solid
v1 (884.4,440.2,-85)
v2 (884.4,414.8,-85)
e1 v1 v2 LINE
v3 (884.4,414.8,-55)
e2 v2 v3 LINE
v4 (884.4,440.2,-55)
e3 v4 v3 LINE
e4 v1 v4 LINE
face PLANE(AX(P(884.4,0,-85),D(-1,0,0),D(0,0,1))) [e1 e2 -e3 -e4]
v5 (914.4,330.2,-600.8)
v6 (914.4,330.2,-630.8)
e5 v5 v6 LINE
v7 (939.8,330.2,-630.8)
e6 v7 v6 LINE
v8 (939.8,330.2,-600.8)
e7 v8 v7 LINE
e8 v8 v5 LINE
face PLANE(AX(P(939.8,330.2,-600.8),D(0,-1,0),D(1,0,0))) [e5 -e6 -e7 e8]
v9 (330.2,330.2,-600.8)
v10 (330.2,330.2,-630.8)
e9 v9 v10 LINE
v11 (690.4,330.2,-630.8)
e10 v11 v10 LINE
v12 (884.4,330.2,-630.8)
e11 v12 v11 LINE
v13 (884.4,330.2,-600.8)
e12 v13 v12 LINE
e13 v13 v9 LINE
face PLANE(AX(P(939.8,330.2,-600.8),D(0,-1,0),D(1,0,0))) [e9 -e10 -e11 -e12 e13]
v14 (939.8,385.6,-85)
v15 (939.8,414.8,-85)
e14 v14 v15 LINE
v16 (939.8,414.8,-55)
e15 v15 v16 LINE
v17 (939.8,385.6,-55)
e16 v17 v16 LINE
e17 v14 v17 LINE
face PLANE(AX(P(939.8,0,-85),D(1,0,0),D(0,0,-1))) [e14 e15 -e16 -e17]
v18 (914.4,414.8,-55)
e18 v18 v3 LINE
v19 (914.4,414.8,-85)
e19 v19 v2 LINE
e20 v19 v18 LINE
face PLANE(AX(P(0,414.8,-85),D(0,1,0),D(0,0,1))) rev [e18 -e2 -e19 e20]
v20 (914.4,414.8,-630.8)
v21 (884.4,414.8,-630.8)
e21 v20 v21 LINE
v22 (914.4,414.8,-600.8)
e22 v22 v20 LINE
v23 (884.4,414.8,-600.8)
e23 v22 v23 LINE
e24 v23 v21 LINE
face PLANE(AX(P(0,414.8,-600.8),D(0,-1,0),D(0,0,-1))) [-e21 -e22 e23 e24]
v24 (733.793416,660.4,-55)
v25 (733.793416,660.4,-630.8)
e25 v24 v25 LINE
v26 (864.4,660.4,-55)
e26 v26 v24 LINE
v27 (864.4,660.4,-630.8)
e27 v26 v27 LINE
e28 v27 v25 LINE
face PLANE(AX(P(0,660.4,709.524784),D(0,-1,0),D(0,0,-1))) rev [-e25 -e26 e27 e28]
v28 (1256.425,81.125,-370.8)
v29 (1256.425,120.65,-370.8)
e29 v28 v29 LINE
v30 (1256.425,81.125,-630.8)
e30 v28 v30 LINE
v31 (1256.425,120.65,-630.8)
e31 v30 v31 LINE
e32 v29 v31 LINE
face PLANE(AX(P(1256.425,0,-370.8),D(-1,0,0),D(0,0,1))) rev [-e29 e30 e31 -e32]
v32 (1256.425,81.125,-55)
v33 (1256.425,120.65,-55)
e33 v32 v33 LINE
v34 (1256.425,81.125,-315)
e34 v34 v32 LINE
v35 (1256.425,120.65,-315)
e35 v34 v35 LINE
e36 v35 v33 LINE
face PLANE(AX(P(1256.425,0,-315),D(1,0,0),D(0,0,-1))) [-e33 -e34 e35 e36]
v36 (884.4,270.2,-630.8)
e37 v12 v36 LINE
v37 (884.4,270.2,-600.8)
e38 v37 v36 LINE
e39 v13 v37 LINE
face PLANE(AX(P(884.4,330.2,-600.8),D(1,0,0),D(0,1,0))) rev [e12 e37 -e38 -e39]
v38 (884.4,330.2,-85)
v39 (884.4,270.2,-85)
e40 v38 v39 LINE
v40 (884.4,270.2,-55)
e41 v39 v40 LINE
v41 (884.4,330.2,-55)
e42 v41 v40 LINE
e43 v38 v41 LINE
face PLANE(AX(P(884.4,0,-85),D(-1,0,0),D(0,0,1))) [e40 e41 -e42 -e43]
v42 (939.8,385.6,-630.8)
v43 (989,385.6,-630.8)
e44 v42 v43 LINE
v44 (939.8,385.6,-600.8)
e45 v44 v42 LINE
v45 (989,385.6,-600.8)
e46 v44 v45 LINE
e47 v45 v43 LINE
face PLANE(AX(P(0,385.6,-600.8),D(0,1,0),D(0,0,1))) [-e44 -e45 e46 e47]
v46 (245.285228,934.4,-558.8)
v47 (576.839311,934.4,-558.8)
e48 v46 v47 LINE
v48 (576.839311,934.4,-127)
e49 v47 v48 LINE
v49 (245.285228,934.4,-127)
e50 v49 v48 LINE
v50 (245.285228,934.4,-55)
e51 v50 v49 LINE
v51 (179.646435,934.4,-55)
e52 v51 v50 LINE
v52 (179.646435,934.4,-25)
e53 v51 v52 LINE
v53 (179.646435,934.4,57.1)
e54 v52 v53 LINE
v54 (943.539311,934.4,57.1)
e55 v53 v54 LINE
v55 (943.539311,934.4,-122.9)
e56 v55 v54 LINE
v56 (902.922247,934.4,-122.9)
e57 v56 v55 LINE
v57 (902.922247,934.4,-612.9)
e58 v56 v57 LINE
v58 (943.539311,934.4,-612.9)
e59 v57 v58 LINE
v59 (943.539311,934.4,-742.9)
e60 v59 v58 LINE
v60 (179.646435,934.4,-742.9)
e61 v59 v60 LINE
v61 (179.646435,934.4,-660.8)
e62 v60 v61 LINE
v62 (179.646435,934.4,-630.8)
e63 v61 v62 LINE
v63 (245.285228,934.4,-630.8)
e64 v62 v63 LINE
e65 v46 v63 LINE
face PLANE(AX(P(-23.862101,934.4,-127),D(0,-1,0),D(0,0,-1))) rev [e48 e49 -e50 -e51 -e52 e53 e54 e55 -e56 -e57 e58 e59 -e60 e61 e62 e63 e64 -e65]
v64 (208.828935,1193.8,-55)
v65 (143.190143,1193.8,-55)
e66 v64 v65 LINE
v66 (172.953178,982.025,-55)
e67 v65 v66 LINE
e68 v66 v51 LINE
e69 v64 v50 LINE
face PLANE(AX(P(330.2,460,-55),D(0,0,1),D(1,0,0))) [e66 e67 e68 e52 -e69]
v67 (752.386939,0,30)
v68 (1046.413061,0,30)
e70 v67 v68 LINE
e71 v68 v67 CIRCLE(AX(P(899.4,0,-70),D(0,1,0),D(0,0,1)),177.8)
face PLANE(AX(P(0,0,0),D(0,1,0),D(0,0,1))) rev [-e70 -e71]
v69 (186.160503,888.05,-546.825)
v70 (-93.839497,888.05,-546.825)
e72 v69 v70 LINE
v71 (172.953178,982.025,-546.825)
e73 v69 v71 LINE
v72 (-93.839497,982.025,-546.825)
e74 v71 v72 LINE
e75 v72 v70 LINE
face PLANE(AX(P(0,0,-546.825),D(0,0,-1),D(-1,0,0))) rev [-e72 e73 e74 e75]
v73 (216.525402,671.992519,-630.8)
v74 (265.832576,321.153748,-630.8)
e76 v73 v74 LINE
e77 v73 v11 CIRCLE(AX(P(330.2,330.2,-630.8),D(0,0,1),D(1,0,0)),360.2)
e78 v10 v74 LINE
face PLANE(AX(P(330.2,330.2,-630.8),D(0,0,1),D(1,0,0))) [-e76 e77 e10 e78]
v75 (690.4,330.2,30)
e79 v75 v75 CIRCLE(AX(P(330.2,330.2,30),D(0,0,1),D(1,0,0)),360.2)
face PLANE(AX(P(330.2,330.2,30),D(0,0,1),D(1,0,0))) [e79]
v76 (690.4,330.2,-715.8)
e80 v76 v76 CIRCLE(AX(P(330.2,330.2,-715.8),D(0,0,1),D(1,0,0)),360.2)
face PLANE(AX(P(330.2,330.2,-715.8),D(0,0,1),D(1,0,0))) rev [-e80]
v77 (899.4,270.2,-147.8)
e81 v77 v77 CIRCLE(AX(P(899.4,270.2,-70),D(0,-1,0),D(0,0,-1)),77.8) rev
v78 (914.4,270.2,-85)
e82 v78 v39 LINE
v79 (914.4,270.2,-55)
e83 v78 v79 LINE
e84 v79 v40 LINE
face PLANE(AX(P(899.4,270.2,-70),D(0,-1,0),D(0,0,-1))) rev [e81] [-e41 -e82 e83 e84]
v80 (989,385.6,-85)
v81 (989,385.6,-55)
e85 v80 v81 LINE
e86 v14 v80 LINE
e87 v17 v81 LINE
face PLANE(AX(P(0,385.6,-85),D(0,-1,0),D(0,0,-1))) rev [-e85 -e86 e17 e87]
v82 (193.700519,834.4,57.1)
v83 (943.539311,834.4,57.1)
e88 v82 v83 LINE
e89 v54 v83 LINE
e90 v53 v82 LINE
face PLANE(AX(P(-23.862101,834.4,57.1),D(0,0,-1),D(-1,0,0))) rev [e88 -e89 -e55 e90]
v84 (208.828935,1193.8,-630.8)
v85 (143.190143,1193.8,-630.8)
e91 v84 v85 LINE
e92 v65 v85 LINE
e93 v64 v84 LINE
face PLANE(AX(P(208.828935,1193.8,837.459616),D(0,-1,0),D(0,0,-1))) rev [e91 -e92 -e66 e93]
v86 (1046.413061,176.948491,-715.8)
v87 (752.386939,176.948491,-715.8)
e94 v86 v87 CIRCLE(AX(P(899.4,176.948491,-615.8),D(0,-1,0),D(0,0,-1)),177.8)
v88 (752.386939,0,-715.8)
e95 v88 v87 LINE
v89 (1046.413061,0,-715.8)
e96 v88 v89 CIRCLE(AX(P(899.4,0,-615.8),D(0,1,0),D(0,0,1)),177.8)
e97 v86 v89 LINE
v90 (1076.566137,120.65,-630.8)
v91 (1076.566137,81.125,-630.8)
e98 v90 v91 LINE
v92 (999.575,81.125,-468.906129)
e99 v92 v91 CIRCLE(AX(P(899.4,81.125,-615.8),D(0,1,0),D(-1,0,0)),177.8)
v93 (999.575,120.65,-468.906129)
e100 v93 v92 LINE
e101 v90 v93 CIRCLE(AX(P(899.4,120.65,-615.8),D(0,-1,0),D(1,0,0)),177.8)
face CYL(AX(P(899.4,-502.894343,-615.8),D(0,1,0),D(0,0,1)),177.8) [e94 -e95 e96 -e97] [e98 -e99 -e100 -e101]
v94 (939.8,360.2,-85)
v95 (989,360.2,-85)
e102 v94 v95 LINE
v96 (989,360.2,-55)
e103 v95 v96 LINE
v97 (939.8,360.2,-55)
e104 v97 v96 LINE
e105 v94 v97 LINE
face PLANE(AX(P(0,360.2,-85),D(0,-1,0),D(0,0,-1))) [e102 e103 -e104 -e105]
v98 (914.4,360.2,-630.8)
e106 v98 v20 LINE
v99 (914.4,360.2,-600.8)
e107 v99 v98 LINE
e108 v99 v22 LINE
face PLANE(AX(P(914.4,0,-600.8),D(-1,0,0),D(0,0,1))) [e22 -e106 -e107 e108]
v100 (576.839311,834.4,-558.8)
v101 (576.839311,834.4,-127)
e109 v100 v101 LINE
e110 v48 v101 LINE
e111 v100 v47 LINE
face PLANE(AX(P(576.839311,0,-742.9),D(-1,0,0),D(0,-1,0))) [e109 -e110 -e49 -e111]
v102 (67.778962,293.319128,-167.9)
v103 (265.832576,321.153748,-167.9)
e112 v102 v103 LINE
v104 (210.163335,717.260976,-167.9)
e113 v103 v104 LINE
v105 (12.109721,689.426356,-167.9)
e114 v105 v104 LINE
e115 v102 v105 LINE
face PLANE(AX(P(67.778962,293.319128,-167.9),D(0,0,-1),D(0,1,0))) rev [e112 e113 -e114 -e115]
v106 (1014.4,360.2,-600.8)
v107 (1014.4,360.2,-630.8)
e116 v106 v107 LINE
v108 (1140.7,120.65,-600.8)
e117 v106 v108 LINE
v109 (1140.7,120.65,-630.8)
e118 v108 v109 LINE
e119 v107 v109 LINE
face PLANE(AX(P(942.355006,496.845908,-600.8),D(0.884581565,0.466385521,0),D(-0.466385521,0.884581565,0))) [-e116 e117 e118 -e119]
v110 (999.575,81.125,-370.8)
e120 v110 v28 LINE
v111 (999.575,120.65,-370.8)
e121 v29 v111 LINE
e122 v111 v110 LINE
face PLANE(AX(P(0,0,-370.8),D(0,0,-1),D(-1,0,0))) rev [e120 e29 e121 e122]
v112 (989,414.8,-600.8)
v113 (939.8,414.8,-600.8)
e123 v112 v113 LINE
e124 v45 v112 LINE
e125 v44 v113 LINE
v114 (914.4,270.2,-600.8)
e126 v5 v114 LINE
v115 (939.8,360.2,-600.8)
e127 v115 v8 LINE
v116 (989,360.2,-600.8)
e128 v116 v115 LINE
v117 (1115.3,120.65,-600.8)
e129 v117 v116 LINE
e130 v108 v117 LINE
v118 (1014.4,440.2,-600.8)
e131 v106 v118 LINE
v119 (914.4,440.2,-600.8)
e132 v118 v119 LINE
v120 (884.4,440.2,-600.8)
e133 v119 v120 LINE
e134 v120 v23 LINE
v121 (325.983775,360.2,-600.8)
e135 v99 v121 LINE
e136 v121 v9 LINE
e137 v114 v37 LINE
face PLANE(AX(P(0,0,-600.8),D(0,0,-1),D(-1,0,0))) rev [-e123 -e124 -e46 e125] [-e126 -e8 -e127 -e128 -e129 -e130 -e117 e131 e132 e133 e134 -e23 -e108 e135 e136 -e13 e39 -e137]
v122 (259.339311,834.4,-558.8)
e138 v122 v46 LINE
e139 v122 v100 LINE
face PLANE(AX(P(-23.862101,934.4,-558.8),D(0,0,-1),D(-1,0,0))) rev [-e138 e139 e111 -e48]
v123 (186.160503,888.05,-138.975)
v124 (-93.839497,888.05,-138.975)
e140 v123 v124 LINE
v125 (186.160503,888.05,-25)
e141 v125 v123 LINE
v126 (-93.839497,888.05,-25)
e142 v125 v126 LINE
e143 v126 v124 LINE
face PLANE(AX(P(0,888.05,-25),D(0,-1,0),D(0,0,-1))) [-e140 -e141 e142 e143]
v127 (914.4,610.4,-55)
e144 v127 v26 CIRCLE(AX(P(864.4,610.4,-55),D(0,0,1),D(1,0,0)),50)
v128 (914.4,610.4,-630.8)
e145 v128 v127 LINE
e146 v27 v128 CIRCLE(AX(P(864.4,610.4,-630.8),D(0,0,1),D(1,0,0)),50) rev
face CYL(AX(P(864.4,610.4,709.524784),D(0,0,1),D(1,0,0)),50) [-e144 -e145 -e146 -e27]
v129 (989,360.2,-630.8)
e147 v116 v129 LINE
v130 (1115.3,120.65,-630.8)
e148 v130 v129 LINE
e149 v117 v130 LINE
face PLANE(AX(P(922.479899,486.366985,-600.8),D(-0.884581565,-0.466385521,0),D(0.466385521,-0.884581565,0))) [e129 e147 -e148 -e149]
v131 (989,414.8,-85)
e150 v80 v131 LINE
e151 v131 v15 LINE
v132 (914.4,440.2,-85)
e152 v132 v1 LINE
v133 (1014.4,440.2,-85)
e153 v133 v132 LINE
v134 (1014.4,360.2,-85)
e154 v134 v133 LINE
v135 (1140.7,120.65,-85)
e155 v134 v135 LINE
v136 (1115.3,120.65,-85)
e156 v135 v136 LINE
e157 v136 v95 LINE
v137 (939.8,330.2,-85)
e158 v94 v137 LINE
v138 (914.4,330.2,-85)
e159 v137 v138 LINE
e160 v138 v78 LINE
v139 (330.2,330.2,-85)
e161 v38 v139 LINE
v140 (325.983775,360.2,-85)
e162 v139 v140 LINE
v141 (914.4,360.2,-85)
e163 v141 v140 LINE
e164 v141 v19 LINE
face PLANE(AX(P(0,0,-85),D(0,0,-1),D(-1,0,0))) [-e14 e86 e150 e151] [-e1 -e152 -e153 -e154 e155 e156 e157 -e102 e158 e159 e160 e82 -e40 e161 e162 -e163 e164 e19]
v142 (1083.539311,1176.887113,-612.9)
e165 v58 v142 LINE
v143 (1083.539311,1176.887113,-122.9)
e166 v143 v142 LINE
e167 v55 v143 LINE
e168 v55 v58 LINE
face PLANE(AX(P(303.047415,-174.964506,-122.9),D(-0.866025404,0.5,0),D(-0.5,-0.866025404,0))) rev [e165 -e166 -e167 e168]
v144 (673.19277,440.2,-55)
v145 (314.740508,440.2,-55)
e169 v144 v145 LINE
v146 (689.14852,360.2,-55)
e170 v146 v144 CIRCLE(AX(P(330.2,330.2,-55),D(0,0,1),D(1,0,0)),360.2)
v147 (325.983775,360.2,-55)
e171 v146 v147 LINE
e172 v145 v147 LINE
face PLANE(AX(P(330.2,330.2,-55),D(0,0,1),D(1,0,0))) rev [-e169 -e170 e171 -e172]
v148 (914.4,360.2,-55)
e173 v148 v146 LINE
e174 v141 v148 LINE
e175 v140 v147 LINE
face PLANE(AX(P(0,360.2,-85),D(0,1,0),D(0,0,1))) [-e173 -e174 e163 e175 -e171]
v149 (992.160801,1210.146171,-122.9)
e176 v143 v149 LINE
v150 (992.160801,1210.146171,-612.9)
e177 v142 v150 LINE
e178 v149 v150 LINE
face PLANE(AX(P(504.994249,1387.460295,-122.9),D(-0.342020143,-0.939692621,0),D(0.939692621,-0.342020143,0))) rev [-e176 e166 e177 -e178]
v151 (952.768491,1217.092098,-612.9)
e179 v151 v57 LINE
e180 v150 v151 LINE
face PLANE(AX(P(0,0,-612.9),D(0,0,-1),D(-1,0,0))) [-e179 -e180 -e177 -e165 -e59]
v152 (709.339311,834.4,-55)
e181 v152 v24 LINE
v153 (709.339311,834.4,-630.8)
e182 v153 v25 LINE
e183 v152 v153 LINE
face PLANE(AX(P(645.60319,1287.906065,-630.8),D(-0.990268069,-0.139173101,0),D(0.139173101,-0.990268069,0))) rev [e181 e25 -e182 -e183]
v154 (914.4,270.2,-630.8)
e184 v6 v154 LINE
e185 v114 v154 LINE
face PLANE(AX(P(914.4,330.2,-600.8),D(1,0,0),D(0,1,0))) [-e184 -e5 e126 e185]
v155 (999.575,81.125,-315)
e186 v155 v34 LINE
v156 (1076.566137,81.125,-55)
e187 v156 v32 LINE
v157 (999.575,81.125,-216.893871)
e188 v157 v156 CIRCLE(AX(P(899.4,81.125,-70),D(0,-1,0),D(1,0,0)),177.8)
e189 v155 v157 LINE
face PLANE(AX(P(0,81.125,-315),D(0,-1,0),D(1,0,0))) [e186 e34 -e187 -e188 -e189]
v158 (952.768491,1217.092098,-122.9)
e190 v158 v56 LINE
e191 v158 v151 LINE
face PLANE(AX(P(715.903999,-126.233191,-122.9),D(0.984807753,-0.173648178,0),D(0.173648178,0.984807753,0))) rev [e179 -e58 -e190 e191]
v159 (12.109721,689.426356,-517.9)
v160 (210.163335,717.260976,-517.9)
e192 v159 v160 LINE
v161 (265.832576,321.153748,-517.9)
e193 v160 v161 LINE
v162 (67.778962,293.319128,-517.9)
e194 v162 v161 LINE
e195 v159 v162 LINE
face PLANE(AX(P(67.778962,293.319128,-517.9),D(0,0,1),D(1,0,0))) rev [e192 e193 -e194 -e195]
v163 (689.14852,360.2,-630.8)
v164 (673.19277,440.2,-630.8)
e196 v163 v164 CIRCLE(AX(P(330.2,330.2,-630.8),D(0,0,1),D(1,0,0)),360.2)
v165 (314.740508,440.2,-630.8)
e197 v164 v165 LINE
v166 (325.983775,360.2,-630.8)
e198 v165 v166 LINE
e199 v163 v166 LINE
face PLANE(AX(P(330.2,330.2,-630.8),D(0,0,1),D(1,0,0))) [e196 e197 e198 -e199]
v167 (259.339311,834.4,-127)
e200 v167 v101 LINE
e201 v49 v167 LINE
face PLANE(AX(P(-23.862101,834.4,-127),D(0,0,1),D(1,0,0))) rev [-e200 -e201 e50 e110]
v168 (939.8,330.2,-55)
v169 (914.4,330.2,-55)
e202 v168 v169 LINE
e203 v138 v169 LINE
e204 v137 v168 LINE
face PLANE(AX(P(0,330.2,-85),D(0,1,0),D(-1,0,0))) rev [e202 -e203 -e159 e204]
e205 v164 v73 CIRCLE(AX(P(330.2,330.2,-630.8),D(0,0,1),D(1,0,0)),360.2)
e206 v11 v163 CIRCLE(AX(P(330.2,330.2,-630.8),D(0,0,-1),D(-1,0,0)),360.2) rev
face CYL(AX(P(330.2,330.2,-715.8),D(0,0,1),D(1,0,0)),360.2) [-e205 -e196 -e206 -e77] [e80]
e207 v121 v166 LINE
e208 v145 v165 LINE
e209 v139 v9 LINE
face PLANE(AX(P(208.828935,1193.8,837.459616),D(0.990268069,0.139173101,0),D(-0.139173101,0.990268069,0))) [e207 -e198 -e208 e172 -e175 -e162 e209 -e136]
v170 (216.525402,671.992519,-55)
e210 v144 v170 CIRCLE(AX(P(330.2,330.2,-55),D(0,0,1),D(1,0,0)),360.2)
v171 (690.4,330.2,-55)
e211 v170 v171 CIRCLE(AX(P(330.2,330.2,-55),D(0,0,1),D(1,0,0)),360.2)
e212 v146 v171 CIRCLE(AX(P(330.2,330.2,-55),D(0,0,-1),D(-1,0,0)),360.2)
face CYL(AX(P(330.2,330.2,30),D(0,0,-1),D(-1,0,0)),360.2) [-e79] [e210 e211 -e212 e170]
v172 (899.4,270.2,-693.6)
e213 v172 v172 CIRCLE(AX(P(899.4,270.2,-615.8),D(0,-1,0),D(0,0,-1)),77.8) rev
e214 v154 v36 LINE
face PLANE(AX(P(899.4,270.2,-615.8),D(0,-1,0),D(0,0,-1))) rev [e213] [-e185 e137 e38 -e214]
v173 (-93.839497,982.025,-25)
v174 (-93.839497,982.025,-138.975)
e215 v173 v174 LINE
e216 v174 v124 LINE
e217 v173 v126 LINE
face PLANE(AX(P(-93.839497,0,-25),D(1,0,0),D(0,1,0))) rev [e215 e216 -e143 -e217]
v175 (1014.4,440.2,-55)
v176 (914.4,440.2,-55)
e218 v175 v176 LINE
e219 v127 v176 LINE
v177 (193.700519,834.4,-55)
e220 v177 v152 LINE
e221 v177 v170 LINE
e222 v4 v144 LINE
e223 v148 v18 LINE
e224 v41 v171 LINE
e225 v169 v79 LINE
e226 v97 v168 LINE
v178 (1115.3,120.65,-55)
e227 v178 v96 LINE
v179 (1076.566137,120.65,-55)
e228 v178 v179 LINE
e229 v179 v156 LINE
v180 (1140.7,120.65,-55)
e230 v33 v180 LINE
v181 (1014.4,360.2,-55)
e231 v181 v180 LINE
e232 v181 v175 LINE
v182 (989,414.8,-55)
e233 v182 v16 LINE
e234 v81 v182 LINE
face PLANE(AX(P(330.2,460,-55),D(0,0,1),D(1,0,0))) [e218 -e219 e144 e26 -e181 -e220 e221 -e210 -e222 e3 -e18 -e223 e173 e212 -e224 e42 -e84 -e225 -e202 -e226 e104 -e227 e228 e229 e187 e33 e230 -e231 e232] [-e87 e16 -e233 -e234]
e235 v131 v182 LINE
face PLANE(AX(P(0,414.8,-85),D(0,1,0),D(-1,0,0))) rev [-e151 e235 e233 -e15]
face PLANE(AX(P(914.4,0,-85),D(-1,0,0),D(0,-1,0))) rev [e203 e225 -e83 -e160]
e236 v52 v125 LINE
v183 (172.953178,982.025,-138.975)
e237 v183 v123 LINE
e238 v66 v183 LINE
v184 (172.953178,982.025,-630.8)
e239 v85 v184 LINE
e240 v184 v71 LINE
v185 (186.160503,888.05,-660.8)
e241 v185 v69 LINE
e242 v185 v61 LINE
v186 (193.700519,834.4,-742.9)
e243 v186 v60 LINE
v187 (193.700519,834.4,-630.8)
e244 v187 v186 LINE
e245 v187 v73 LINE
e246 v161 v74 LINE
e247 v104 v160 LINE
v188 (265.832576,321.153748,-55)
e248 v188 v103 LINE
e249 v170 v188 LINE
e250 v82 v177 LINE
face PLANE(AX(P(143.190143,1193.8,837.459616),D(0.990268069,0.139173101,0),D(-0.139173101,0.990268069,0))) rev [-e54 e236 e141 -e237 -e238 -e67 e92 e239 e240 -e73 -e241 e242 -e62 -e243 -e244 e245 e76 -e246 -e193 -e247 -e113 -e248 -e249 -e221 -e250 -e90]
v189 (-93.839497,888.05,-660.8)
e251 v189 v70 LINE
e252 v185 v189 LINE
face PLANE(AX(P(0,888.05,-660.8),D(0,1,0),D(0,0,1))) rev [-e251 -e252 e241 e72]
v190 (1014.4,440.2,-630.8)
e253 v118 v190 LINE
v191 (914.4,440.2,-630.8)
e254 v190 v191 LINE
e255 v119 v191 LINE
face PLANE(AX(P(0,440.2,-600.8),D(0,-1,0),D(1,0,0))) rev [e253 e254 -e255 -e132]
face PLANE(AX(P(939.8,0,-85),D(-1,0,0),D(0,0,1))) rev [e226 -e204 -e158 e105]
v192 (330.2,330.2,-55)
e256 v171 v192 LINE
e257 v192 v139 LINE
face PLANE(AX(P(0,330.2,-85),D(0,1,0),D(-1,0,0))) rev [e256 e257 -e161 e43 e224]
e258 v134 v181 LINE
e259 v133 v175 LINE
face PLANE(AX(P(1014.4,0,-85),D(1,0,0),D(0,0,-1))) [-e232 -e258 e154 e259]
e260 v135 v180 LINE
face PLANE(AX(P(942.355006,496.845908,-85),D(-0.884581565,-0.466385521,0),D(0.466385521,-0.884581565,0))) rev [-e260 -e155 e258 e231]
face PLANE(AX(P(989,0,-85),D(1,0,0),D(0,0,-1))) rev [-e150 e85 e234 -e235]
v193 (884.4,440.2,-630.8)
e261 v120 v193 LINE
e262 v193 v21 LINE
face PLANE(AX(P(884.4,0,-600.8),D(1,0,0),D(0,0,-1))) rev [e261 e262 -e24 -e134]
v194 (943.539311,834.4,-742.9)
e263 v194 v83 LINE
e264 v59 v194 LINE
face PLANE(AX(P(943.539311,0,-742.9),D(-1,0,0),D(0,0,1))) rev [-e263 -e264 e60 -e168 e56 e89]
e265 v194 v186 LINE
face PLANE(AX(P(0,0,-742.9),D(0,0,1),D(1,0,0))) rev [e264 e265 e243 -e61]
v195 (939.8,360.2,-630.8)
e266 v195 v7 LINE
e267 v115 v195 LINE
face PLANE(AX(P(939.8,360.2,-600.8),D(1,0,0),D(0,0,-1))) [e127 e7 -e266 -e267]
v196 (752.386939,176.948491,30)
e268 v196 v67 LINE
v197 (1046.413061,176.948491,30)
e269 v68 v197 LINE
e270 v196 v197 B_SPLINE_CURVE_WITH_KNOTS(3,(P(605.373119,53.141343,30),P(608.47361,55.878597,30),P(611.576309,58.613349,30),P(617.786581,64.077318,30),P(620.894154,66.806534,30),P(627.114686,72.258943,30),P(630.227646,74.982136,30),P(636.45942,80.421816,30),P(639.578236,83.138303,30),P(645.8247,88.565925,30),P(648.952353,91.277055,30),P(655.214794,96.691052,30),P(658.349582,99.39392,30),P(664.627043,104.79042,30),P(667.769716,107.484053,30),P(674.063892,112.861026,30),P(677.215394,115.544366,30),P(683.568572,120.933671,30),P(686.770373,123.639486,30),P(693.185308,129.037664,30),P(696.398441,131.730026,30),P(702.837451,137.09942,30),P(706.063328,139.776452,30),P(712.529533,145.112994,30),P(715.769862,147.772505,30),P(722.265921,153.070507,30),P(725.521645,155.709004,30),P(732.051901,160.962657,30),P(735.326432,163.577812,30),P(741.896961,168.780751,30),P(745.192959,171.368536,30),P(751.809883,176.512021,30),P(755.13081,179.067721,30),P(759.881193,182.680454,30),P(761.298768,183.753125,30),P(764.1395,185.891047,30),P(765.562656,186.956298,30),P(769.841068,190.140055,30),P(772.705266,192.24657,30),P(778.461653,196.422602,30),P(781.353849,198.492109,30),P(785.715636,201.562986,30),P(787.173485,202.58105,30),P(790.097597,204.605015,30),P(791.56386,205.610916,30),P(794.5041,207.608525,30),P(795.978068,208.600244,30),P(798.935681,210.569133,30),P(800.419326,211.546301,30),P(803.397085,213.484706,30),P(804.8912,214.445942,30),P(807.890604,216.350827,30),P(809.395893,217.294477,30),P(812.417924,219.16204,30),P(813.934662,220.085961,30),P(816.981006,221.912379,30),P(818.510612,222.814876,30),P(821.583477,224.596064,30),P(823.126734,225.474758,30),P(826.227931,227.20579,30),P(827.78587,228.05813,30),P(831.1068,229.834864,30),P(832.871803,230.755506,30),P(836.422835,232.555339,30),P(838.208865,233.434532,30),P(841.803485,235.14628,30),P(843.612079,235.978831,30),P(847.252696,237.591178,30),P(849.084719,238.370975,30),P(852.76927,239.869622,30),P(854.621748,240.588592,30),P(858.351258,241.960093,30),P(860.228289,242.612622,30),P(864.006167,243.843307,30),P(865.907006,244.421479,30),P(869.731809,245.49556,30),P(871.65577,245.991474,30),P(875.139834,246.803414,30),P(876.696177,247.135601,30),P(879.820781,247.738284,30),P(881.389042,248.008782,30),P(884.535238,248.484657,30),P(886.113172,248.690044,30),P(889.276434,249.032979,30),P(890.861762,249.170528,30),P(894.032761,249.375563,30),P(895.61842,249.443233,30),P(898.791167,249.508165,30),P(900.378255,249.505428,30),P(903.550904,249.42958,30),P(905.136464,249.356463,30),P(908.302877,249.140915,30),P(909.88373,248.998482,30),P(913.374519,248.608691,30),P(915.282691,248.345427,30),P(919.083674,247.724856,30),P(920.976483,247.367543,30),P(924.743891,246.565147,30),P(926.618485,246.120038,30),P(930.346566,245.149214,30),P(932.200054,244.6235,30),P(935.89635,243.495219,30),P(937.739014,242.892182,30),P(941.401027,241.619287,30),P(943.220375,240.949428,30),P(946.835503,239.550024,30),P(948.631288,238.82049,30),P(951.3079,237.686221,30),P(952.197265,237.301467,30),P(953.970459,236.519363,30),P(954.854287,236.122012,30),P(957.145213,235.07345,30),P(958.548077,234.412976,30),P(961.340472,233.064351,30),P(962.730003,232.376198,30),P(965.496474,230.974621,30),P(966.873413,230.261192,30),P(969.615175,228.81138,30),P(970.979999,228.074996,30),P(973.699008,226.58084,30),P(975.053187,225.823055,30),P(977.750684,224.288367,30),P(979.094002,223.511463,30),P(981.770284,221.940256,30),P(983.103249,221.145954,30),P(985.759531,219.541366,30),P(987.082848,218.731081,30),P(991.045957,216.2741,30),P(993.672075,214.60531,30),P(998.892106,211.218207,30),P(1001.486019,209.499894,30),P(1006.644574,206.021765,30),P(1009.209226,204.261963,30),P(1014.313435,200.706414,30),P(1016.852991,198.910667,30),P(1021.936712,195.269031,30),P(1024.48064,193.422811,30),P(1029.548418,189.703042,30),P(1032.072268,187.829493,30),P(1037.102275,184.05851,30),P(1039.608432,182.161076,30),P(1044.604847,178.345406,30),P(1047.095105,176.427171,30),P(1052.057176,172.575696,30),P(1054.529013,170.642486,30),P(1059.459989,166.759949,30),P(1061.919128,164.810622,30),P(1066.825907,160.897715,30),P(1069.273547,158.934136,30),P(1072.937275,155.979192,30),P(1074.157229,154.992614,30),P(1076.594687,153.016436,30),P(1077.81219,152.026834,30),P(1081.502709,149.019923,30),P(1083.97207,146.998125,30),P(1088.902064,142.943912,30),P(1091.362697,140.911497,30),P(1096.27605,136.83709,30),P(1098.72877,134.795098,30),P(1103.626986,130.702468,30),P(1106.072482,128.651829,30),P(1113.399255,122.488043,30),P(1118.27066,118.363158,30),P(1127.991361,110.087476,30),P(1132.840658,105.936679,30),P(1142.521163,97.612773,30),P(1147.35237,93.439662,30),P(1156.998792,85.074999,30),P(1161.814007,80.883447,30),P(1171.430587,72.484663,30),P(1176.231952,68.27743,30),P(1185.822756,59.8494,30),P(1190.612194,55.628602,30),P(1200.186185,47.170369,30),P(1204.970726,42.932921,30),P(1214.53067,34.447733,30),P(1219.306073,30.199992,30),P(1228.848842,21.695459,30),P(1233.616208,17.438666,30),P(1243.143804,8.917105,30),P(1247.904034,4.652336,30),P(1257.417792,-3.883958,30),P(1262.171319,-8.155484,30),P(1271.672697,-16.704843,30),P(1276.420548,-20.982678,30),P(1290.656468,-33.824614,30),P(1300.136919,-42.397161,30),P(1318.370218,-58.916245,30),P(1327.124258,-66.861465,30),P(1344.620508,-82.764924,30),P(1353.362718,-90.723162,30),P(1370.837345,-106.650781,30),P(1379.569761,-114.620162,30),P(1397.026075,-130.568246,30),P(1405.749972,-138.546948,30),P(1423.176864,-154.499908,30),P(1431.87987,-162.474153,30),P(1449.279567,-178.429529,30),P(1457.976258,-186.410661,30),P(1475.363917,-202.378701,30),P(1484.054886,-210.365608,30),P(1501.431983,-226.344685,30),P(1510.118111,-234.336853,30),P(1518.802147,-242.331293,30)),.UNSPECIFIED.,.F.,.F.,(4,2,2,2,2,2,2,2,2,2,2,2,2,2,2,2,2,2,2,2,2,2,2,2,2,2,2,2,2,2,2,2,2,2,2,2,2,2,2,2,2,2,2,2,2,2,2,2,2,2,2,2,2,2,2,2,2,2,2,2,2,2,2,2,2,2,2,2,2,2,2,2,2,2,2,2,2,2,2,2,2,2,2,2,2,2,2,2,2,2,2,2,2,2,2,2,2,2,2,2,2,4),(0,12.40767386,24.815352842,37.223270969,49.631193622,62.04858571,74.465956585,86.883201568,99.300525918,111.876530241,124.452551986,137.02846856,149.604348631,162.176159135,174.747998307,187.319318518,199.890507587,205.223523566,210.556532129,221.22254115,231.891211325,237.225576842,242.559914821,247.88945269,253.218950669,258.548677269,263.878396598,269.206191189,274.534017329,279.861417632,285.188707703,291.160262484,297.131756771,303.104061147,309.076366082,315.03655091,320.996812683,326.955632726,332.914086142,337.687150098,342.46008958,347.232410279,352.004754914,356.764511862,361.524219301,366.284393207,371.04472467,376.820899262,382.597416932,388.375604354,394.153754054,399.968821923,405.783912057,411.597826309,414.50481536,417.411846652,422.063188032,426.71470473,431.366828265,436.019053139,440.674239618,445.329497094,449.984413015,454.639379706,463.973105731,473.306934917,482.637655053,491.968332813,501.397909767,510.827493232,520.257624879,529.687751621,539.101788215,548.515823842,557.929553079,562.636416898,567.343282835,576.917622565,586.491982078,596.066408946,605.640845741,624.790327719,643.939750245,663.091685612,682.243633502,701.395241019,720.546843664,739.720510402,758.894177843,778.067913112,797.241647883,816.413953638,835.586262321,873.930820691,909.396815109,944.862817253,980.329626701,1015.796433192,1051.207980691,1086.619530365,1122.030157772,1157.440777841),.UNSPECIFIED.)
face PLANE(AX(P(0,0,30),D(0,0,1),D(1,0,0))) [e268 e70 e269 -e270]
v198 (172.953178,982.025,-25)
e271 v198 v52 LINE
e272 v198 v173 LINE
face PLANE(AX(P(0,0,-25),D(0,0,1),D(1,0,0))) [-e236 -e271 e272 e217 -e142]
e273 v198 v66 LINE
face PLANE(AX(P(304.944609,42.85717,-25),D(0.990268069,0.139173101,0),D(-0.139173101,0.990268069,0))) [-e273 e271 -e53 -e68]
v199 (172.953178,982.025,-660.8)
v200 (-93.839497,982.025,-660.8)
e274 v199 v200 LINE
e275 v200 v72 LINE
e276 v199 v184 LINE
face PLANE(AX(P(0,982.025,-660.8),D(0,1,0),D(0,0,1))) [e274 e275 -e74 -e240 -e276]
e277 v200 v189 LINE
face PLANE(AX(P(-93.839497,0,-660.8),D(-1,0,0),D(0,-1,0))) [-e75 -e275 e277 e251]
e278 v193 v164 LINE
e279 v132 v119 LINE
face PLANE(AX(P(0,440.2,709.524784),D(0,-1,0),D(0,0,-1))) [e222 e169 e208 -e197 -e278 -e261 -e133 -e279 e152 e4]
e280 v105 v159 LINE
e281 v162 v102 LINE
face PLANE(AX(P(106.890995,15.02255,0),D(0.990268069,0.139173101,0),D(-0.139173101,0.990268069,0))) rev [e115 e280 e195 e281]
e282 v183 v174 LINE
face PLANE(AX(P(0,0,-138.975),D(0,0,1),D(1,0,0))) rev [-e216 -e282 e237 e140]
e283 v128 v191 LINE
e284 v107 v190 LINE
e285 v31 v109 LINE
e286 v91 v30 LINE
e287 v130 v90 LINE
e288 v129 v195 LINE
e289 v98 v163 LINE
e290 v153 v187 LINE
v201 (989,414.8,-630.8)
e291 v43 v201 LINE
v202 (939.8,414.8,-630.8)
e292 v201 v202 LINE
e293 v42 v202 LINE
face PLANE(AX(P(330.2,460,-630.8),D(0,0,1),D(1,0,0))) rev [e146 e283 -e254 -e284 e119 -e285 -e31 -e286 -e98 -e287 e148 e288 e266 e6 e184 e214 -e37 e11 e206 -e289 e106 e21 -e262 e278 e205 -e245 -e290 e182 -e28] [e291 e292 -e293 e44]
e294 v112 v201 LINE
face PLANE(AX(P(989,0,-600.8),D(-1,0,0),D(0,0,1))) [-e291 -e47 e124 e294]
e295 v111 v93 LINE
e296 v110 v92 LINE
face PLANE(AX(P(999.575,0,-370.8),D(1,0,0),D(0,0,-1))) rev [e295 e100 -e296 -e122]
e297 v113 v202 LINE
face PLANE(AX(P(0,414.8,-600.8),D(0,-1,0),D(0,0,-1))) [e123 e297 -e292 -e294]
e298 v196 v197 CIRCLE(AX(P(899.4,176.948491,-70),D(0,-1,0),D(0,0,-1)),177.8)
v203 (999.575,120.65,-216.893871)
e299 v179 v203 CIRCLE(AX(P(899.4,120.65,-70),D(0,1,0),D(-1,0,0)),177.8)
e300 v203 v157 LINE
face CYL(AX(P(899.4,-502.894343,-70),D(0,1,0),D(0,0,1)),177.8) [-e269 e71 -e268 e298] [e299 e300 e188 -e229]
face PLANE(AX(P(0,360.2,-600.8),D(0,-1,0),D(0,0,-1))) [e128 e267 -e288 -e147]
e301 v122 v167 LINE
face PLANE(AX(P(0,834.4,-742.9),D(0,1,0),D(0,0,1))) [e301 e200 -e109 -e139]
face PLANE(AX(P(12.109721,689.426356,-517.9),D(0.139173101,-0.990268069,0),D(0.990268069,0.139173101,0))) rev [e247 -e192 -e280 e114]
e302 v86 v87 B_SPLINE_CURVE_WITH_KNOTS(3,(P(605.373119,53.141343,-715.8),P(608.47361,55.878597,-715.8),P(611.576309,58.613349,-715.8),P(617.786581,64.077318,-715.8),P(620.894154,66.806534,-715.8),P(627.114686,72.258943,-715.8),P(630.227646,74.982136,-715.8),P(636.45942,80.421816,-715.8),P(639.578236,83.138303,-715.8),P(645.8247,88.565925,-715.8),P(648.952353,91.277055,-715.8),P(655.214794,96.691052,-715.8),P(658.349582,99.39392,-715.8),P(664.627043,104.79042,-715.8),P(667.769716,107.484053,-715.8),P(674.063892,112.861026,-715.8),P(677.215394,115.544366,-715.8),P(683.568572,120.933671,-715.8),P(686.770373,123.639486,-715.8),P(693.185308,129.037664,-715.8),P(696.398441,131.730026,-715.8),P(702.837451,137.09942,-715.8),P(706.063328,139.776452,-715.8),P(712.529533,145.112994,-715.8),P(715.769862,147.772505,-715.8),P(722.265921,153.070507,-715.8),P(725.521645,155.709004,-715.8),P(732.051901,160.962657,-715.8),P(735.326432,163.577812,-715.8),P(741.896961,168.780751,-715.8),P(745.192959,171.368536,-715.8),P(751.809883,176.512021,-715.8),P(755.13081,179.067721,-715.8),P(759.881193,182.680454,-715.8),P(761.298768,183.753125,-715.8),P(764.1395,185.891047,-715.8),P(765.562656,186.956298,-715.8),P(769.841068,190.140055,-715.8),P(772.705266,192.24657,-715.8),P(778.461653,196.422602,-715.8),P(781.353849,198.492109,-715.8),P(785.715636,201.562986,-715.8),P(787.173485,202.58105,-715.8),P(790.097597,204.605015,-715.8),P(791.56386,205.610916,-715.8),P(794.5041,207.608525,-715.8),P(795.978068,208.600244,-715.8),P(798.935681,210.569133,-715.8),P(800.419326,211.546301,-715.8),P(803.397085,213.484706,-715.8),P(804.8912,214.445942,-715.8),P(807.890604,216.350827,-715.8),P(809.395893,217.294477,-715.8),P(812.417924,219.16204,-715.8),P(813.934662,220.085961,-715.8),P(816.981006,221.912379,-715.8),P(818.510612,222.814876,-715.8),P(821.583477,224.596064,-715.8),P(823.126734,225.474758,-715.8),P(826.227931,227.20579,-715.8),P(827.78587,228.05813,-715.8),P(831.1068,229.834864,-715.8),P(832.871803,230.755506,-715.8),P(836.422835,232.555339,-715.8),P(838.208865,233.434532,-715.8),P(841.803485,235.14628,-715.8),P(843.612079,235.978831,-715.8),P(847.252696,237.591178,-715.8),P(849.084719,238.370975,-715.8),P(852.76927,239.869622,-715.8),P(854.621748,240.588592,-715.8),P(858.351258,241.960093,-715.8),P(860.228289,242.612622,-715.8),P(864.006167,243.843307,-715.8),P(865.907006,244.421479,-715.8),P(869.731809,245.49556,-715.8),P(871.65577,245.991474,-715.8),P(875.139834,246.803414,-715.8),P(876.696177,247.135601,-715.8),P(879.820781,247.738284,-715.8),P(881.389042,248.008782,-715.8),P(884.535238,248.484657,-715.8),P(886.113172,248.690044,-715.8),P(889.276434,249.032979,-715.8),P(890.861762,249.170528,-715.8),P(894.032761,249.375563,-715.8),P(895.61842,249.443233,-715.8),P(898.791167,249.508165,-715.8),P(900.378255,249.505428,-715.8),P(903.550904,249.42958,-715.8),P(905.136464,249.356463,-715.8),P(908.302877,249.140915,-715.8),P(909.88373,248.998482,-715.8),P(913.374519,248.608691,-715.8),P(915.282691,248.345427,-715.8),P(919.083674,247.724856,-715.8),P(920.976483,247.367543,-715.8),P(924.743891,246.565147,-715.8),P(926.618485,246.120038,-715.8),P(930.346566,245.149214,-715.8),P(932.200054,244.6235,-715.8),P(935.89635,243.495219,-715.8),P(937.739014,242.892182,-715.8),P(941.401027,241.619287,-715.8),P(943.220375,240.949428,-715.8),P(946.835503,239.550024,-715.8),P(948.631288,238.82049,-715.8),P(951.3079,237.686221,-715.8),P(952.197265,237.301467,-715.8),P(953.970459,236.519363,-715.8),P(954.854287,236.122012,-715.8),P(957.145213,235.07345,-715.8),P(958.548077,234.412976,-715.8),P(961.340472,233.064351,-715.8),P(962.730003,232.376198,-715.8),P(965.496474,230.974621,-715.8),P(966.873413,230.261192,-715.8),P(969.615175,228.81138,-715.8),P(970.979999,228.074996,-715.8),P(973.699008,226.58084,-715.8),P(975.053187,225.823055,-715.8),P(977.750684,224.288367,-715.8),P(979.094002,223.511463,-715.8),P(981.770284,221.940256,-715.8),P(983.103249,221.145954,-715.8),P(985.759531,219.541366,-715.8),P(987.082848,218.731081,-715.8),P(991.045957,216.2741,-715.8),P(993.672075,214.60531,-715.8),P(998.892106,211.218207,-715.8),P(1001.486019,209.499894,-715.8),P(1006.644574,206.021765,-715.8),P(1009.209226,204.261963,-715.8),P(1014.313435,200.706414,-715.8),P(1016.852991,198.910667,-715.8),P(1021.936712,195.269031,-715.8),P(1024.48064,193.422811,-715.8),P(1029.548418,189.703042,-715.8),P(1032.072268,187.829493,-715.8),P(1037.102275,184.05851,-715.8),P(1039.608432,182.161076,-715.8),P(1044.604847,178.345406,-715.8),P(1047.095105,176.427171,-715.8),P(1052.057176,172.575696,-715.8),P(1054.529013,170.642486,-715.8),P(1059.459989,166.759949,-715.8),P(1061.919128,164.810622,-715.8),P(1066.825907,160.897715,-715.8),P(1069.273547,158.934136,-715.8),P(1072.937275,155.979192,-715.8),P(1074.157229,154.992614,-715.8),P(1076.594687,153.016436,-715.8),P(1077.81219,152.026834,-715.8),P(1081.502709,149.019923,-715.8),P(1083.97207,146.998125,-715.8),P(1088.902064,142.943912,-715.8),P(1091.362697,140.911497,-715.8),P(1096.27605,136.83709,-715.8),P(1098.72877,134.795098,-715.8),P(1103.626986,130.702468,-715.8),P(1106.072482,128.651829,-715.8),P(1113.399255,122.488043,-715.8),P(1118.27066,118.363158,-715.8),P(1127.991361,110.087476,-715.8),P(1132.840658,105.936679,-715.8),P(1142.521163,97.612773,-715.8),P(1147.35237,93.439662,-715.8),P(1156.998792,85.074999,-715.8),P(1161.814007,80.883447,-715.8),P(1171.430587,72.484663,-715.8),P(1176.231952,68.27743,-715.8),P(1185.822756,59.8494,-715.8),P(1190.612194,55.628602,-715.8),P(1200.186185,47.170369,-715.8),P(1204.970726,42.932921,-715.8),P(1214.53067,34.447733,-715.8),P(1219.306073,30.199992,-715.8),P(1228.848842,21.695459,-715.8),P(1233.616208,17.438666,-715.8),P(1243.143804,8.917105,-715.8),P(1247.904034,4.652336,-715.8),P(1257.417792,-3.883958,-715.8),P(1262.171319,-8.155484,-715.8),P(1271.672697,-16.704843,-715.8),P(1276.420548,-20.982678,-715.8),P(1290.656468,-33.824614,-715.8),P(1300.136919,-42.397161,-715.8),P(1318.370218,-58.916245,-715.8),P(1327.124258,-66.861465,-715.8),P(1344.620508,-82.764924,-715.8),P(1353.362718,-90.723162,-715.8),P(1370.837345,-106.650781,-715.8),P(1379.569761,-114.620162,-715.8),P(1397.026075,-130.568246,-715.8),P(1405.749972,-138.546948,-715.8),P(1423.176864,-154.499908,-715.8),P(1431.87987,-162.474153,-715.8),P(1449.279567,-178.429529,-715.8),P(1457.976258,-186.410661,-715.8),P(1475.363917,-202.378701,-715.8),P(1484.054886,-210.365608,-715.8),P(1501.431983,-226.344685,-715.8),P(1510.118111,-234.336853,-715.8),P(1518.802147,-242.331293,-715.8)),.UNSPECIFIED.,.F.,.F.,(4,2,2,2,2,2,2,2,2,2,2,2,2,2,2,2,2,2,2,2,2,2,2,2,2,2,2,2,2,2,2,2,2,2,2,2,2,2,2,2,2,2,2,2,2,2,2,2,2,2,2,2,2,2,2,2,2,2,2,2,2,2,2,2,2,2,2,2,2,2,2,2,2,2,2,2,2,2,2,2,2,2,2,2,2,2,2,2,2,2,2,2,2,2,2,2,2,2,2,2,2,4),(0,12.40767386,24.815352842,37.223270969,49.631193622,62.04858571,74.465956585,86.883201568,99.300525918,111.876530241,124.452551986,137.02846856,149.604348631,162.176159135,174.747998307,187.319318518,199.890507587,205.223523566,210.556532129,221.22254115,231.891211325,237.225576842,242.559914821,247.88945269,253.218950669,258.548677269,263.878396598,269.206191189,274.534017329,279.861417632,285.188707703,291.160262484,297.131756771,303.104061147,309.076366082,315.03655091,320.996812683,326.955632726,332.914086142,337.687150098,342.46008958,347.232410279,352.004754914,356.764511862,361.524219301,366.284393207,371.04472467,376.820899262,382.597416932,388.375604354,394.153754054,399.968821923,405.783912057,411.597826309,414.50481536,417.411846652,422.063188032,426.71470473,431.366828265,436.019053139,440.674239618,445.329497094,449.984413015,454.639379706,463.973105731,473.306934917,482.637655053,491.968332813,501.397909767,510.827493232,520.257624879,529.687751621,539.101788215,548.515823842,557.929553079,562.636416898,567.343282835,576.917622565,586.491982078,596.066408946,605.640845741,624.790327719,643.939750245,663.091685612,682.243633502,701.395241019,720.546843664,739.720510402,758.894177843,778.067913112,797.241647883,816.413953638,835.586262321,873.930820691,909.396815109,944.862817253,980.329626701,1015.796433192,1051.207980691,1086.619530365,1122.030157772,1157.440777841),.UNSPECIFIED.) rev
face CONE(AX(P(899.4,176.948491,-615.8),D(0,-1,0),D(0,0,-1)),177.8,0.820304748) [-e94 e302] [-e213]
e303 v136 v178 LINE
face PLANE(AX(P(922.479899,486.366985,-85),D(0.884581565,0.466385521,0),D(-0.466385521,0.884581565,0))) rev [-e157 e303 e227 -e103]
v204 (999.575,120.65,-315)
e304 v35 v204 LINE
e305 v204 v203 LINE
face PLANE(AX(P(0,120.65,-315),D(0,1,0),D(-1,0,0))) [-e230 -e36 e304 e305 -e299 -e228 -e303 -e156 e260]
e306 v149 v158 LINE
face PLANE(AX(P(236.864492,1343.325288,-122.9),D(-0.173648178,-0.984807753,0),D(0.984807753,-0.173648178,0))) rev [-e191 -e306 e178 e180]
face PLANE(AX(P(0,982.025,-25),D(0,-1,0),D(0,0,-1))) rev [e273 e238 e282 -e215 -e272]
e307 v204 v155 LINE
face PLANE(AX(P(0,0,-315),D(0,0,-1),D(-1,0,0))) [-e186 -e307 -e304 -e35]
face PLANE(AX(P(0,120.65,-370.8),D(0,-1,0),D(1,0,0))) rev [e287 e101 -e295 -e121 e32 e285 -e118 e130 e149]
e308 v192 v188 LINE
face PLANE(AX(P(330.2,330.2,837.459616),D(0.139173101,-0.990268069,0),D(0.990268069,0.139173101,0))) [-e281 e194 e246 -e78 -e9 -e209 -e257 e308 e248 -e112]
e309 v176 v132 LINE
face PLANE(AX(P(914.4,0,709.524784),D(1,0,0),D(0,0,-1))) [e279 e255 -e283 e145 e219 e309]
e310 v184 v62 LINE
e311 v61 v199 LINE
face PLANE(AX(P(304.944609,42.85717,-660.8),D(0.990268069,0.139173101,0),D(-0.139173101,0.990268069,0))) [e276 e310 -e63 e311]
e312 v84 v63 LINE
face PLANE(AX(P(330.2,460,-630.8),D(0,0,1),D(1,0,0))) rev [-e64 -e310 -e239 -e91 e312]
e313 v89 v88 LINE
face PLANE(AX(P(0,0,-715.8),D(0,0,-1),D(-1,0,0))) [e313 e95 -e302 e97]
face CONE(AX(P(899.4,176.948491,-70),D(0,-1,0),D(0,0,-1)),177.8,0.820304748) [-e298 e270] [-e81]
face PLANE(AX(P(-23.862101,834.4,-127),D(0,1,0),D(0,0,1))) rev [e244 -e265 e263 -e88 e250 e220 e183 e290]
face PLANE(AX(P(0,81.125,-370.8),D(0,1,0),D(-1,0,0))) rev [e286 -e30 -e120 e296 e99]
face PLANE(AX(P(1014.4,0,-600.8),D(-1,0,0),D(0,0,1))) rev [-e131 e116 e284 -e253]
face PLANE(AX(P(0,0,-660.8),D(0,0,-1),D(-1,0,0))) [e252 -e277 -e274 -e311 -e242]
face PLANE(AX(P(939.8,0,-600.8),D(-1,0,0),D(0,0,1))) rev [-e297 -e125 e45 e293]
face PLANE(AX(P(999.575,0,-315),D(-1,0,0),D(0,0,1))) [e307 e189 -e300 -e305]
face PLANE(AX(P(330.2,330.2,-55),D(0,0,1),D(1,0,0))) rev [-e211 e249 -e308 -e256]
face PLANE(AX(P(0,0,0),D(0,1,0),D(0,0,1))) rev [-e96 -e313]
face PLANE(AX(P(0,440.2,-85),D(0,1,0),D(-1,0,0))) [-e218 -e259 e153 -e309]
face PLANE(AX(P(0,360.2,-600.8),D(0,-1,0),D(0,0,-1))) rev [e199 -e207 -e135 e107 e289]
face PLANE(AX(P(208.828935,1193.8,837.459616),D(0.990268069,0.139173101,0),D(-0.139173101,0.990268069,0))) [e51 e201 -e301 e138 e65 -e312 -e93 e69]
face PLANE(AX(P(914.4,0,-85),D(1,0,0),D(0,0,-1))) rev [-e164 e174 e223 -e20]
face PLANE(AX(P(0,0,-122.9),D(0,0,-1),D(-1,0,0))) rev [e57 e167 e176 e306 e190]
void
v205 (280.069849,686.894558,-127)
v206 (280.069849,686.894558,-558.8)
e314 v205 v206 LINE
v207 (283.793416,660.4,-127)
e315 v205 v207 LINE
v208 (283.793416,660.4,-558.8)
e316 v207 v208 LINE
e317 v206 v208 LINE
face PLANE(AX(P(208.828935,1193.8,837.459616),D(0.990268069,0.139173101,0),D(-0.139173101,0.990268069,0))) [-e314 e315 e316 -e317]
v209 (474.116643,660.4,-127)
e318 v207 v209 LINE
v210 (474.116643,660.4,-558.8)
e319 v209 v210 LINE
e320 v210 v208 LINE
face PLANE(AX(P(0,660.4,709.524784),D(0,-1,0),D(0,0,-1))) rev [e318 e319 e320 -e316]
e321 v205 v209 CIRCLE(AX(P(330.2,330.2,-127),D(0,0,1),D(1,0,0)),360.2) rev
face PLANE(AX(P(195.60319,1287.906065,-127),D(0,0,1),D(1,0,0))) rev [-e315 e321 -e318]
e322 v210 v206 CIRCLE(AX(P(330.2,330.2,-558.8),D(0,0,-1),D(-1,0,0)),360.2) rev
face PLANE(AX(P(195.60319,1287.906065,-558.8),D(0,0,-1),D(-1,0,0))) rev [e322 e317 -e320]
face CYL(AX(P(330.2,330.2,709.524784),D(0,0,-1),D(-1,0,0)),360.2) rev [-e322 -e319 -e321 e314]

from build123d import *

# Parameters (mm, degrees)
BOSS_EXTRUDE1_DEPTH       = 30
BOSS_EXTRUDE1_DEPTH_BACK  = 55
SKETCH1_R                 = 360.2
BOSS_EXTRUDE2_DEPTH       = 55
BOSS_EXTRUDE2_DEPTH_BACK  = 30
SKETCH2_R                 = 360.2
BOSS_EXTRUDE3_DEPTH       = 10
BOSS_EXTRUDE6_DEPTH       = 575.8
BOSS_EXTRUDE33_DEPTH      = 400
BOSS_EXTRUDE33_DEPTH_BACK = 400
SKETCH25_W                = 366.7
SKETCH25_H                = 100
SKETCH5_W                 = 450
SKETCH5_H                 = 72
BOSS_EXTRUDE7_DEPTH       = 367.981167426
SKETCH8_W                 = 49.2
SKETCH8_H                 = 29.2
BOSS_EXTRUDE13_DEPTH      = 30
SKETCH19_R                = 177.8
BOSS_EXTRUDE22_DEPTH      = 270.2
CHAMFER1_SIZE             = 100
CHAMFER1_SIZE2            = 93.251508614
BOSS_EXTRUDE27_DEPTH      = 30
BOSS_EXTRUDE20_DEPTH      = 260
BOSS_EXTRUDE28_START      = 30
SKETCH23_W                = 30
SKETCH23_H                = 60
SKETCH23_W_2              = 49.2
SKETCH23_H_2              = 25.4
SKETCH23_W_3              = 25.4
BOSS_EXTRUDE28_DEPTH      = 30
SKETCH24_R                = 177.8
BOSS_EXTRUDE29_DEPTH      = 270.2
CHAMFER2_SIZE             = 100
CHAMFER2_SIZE2            = 93.251508614
BOSS_EXTRUDE30_DEPTH      = 30
BOSS_EXTRUDE31_DEPTH      = 260
BOSS_EXTRUDE18_START      = -83.975
BOSS_EXTRUDE18_DEPTH      = 113.975
BOSS_EXTRUDE19_START      = -30
BOSS_EXTRUDE19_DEPTH      = 113.975
BOSS_EXTRUDE32_START      = -575.8
BOSS_EXTRUDE32_DEPTH      = 575.8
BOSS_EXTRUDE34_REACH      = 1588.441
SKETCH26_W                = 184.1
SKETCH26_H                = 100
SKETCH27_W                = 350
SKETCH27_H                = 400
BOSS_EXTRUDE35_DEPTH      = 200
BOSS_EXTRUDE36_START      = -130
BOSS_EXTRUDE36_DEPTH      = 490
FILLET3_R                 = 50
SKETCH30_W                = 2623.123535912
SKETCH30_H                = 2420.43733062
CUT_EXTRUDE1_DEPTH        = 1934.451296391
SKETCH31_W                = 2584.765961417
SKETCH31_H                = 1858.147621016
CUT_EXTRUDE2_DEPTH        = 1913.404602985


# Read off the part's stored shape, not the designer's step: Boss-Extrude18, Boss-Extrude19, Boss-Extrude32
with BuildPart() as part:
    # Sketch1 → Boss-Extrude1 (new, two sides: drawn at the far end of the back side and taken through both)
    with BuildSketch(Plane.XY.offset(-BOSS_EXTRUDE1_DEPTH_BACK)):
        with Locations((330.2, 330.2)):
            Circle(SKETCH1_R)
    extrude(amount=BOSS_EXTRUDE1_DEPTH + BOSS_EXTRUDE1_DEPTH_BACK)



with BuildPart() as body_2:
    # Sketch2 → Boss-Extrude2 (new, two sides: drawn at the far end of the back side and taken through both)
    with BuildSketch(Plane.XY.offset(-685.8).offset(-BOSS_EXTRUDE2_DEPTH_BACK)):
        with Locations((330.2, 330.2)):
            Circle(SKETCH2_R)
    extrude(amount=BOSS_EXTRUDE2_DEPTH + BOSS_EXTRUDE2_DEPTH_BACK)


with BuildPart() as part_1:
    add(part.part)

    add(body_2.part)  # Boss-Extrude3 merges body 2
    # 3DSketch2 → Boss-Extrude3 (add)
    with BuildSketch(Plane(origin=(330.2, 460, -630.8), x_dir=(0.5893057409504111, 0, 0.807910108664873), z_dir=(0, -1, 0))):
        Polygon((465.194640569, 339.322245639), (0, 0), (247.508411199, -339.322245639), (712.703051768, 0), align=None)
        Polygon((-38.304873162, 52.514157063), (0, 0), (465.194640569, 339.322245639), (426.889767407, 391.836402702), align=None)
    extrude(amount=-BOSS_EXTRUDE3_DEPTH)

    # Sketch4 → Boss-Extrude6 (add)
    with BuildSketch(Plane(origin=(0, -170.8, -630.8), x_dir=(1, 0, 0), z_dir=(0, 0, 1))):
        Polygon((208.828935151, 1364.6), (330.2, 501), (265.832575532, 491.953748438), (143.190142937, 1364.6), align=None)
    extrude(amount=BOSS_EXTRUDE6_DEPTH)

    # Sketch5 → Boss-Extrude7 (add, along a direction that is not the sketch's normal)
    with BuildSketch(Plane(origin=(0, 470, 0), x_dir=(1, 0, 0), z_dir=(0, 1, 0))):
        with Locations((535.552391309, 91)):
            Rectangle(SKETCH5_W, SKETCH5_H)
        with Locations((535.552391309, 594.8)):
            Rectangle(SKETCH5_W, SKETCH5_H)
    extrude(amount=BOSS_EXTRUDE7_DEPTH, dir=(-0.13917310096006222, 0.9902680687415708, 0))

    # Sketch8 → Boss-Extrude13 (add)
    with BuildSketch(Plane(origin=(0, 0, -630.8), x_dir=(-1, 0, 0), z_dir=(0, 0, -1))):
        Polygon((-1014.4, 360.2), (-939.8, 360.2), (-939.8, 330.2), (-914.4, 330.2), (-914.4, 270.2), (-884.4, 270.2), (-884.4, 330.2), (-330.2, 330.2), (-325.983774959, 360.2), (-914.4, 360.2), (-914.4, 414.8), (-884.4, 414.8), (-884.4, 440.2), (-1014.4, 440.2), align=None)
        with Locations((-964.4, 400.2)):
            Rectangle(SKETCH8_W, SKETCH8_H, mode=Mode.SUBTRACT)
    extrude(amount=-BOSS_EXTRUDE13_DEPTH)

    # Sketch19 → Boss-Extrude22 (add)
    with BuildSketch(Plane.XZ.offset(-270.2)):
        with Locations(Location((899.4, -615.8, 0), (0, 0, 90))):
            Circle(SKETCH19_R)
    extrude(amount=BOSS_EXTRUDE22_DEPTH)

    # Chamfer1
    chamfer1_edges = [part_1.edges().sort_by_distance(p)[0] for p in [
        (899.4, 270.2, -793.6),
    ]]
    chamfer1_side = [part_1.faces().sort_by_distance(p)[0] for p in [
        (899.4, 270.2, -788.571056572),
    ]]
    chamfer(chamfer1_edges, length=CHAMFER1_SIZE, length2=CHAMFER1_SIZE2, reference=chamfer1_side[0])

    # Sketch8<7> → Boss-Extrude27 (add)
    with BuildSketch(Plane(origin=(0, 0, -630.8), x_dir=(-1, 0, 0), z_dir=(0, 0, -1))):
        Polygon((-1014.4, 360.2), (-1140.7, 120.65), (-1115.3, 120.65), (-989, 360.2), align=None)
    extrude(amount=-BOSS_EXTRUDE27_DEPTH)

    # Sketch8<4> → Boss-Extrude20 (add)
    with BuildSketch(Plane(origin=(0, 0, -630.8), x_dir=(-1, 0, 0), z_dir=(0, 0, -1))):
        Polygon((-1256.425, 81.125), (-1256.425, 120.65), (-1140.7, 120.65), (-1115.3, 120.65), (-999.575, 120.65), (-999.575, 81.125), align=None)
    extrude(amount=-BOSS_EXTRUDE20_DEPTH)

    # Sketch23 → Boss-Extrude28 (add)
    with BuildSketch(Plane(origin=(0, 0, -55), x_dir=(-1, 0, 0), z_dir=(0, 0, -1)).offset(BOSS_EXTRUDE28_START)):
        with BuildLine():
            Line((-330.2, 360.2), (-689.148519986, 360.2))
            ThreePointArc((-689.148519986, 360.2), (-690.086993999, 345.213046012), (-690.4, 330.2))
            Line((-690.4, 330.2), (-330.2, 330.2))
            Line((-330.2, 330.2), (-330.2, 360.2))
        make_face()
        with BuildLine():
            Line((-914.4, 360.2), (-939.8, 360.2))
            Line((-939.8, 360.2), (-939.8, 330.2))
            Line((-939.8, 330.2), (-914.4, 330.2))
            Line((-914.4, 330.2), (-884.4, 330.2))
            Line((-884.4, 330.2), (-690.4, 330.2))
            ThreePointArc((-690.4, 330.2), (-690.086993999, 345.213046012), (-689.148519986, 360.2))
            Line((-689.148519986, 360.2), (-914.4, 360.2))
        make_face()
        with Locations((-899.4, 300.2)):
            Rectangle(SKETCH23_W, SKETCH23_H)
        Polygon((-939.8, 385.6), (-939.8, 360.2), (-914.4, 360.2), (-914.4, 414.8), (-914.4, 440.2), (-939.8, 440.2), (-939.8, 414.8), align=None)
        with Locations((-964.4, 372.9)):
            Rectangle(SKETCH23_W_2, SKETCH23_H_2)
        with Locations((-964.4, 427.5)):
            Rectangle(SKETCH23_W_2, SKETCH23_H_2)
        Polygon((-1014.4, 440.2), (-1014.4, 385.6), (-989, 385.6), (-989, 414.8), (-989, 440.2), align=None)
        with Locations((-1001.7, 372.9)):
            Rectangle(SKETCH23_W_3, SKETCH23_H_2)
        Polygon((-325.983774959, 360.2), (-330.2, 360.2), (-330.2, 330.2), align=None)
        with Locations((-899.4, 427.5)):
            Rectangle(SKETCH23_W, SKETCH23_H_2)
    extrude(amount=-BOSS_EXTRUDE28_DEPTH)

    # Sketch24 → Boss-Extrude29 (add)
    with BuildSketch(Plane(origin=(0, 270.2, 0), x_dir=(-1, 0, 0), z_dir=(0, -1, 0))):
        with Locations(Location((-899.4, 70, 0), (0, 0, 270))):
            Circle(SKETCH24_R)
    extrude(amount=BOSS_EXTRUDE29_DEPTH)

    # Chamfer2
    chamfer2_edges = [part_1.edges().sort_by_distance(p)[0] for p in [
        (899.4, 270.2, -247.8),
    ]]
    chamfer2_side = [part_1.faces().sort_by_distance(p)[0] for p in [
        (899.4, 270.2, -242.771056572),
    ]]
    chamfer(chamfer2_edges, length=CHAMFER2_SIZE, length2=CHAMFER2_SIZE2, reference=chamfer2_side[0])

    # Sketch23<10> → Boss-Extrude30 (add)
    with BuildSketch(Plane(origin=(0, 0, -55), x_dir=(-1, 0, 0), z_dir=(0, 0, -1))):
        Polygon((-1014.4, 360.2), (-1140.7, 120.65), (-1115.3, 120.65), (-989, 360.2), align=None)
    extrude(amount=BOSS_EXTRUDE30_DEPTH)

    # Sketch23<12> → Boss-Extrude31 (add)
    with BuildSketch(Plane(origin=(0, 0, -55), x_dir=(-1, 0, 0), z_dir=(0, 0, -1))):
        Polygon((-1256.425, 81.125), (-1256.425, 120.65), (-1140.7, 120.65), (-1115.3, 120.65), (-999.575, 120.65), (-999.575, 81.125), align=None)
    extrude(amount=BOSS_EXTRUDE31_DEPTH)

    # Boss-Extrude18 outline → Boss-Extrude18 (add)
    with BuildSketch(Plane(origin=(0, 0, -630.8), x_dir=(-1, 0, 0), z_dir=(0, 0, -1)).offset(BOSS_EXTRUDE18_START)):
        Polygon((93.839496852, 982.025), (-172.953178206, 982.025), (-186.160503148, 888.05), (93.839496852, 888.05), align=None)
    extrude(amount=BOSS_EXTRUDE18_DEPTH)

    # Boss-Extrude19 outline → Boss-Extrude19 (add)
    with BuildSketch(Plane(origin=(0, 0, -55), x_dir=(-1, 0, 0), z_dir=(0, 0, -1)).offset(BOSS_EXTRUDE19_START)):
        Polygon((93.839496852, 982.025), (-172.953178206, 982.025), (-186.160503148, 888.05), (93.839496852, 888.05), align=None)
    extrude(amount=BOSS_EXTRUDE19_DEPTH)

    # Boss-Extrude32 outline → Boss-Extrude32 (add)
    with BuildSketch(Plane(origin=(0, 0, -630.8), x_dir=(-1, 0, 0), z_dir=(0, 0, -1)).offset(BOSS_EXTRUDE32_START)):
        with BuildLine():
            Line((-750.2, 460), (-750.2, 470))
            Line((-750.2, 470), (-310.552391309, 470))
            Line((-310.552391309, 470), (-283.793416382, 660.4))
            Line((-283.793416382, 660.4), (-474.11664254, 660.4))
            ThreePointArc((-474.11664254, 660.4), (-378.928501989, 687.088740497), (-280.069849034, 686.894558361))
            Line((-280.069849034, 686.894558361), (-259.339311143, 834.4))
            Line((-259.339311143, 834.4), (-709.339311143, 834.4))
            Line((-709.339311143, 834.4), (-733.793416381, 660.4))
            Line((-733.793416381, 660.4), (-914.4, 660.4))
            Line((-914.4, 660.4), (-914.4, 440.2))
            Line((-914.4, 440.2), (-314.740508183, 440.2))
            Line((-314.740508183, 440.2), (-311.957799656, 460))
            Line((-311.957799656, 460), (-750.2, 460))
        make_face()
    extrude(amount=BOSS_EXTRUDE32_DEPTH)



with BuildPart() as body_2_2:
    # Sketch25 → Boss-Extrude33 (new, two sides: drawn at the far end of the back side and taken through both)
    with BuildSketch(Plane.XY.offset(-342.9).offset(-BOSS_EXTRUDE33_DEPTH_BACK)):
        with Locations((760.189311143, 884.4)):
            Rectangle(SKETCH25_W, SKETCH25_H)
    extrude(amount=BOSS_EXTRUDE33_DEPTH + BOSS_EXTRUDE33_DEPTH_BACK)


with BuildPart() as part_2:
    add(part_1.part)

    add(body_2_2.part)  # Boss-Extrude34 merges body 2 2
    # Boss-Extrude34: up to this plane
    boss_extrude34_end = Plane(origin=(143.190142937, 1193.8, 837.459616456), z_dir=(0.9902680687415708, 0.1391731009600622, 0))
    # Sketch26 → Boss-Extrude34 (add, up to the surface)
    with BuildSketch(Plane.ZY.offset(-576.839311143), mode=Mode.PRIVATE) as boss_extrude34_sk1:
        with Locations((-34.95, 884.4)):
            Rectangle(SKETCH26_W, SKETCH26_H)
    boss_extrude34_tool1 = split(extrude(boss_extrude34_sk1.sketch, amount=BOSS_EXTRUDE34_REACH, mode=Mode.PRIVATE), bisect_by=boss_extrude34_end, keep=Keep.BOTH, mode=Mode.PRIVATE)
    add(boss_extrude34_tool1.solids().sort_by_distance((576.839311, 884.4, -34.95))[0])
    # Sketch26 → Boss-Extrude34 (add, up to the surface)
    with BuildSketch(Plane.ZY.offset(-576.839311143), mode=Mode.PRIVATE) as boss_extrude34_sk2:
        with Locations((-650.85, 884.4)):
            Rectangle(SKETCH26_W, SKETCH26_H)
    boss_extrude34_tool2 = split(extrude(boss_extrude34_sk2.sketch, amount=BOSS_EXTRUDE34_REACH, mode=Mode.PRIVATE), bisect_by=boss_extrude34_end, keep=Keep.BOTH, mode=Mode.PRIVATE)
    add(boss_extrude34_tool2.solids().sort_by_distance((576.839311, 884.4, -650.85))[0])

    # Sketch27 → Boss-Extrude35 (add)
    with BuildSketch(Plane(origin=(304.944608977, 42.857169884, 0), x_dir=(0, 0, 1), z_dir=(-0.9902680687415708, -0.13917310096006216, 0))):
        with Locations((-342.9, 481.031558361)):
            Rectangle(SKETCH27_W, SKETCH27_H)
    extrude(amount=BOSS_EXTRUDE35_DEPTH)

    # Sketch29 → Boss-Extrude36 (add)
    with BuildSketch(Plane(origin=(0, 0, -742.9), x_dir=(-1, 0, 0), z_dir=(0, 0, -1)).offset(BOSS_EXTRUDE36_START)):
        Polygon((-1083.539311143, 1176.88711306), (-992.16080089, 1210.146170843), (-943.539311143, 934.4), align=None)
        Polygon((-992.16080089, 1210.146170843), (-943.539311143, 934.4), (-902.922246668, 934.4), (-952.768490769, 1217.09209795), align=None)
    extrude(amount=-BOSS_EXTRUDE36_DEPTH)

    # Fillet3
    fillet3_edges = [part_2.edges().sort_by_distance(p)[0] for p in [
        (914.4, 660.4, -342.9),
    ]]
    fillet(fillet3_edges, radius=FILLET3_R)

    # Sketch30 → Cut-Extrude1 (cut, through all)
    with BuildSketch(Plane.XY.offset(30)):
        with Locations((451.826678709, -519.81866531)):
            Rectangle(SKETCH30_W, SKETCH30_H)
    extrude(amount=CUT_EXTRUDE1_DEPTH, mode=Mode.SUBTRACT)

    # Sketch31 → Cut-Extrude2 (cut, through all)
    with BuildSketch(Plane(origin=(0, 0, -715.8), x_dir=(-1, 0, 0), z_dir=(0, 0, -1))):
        with Locations((-741.050727566, -238.673810508)):
            Rectangle(SKETCH31_W, SKETCH31_H)
    extrude(amount=CUT_EXTRUDE2_DEPTH, mode=Mode.SUBTRACT)


solid = part_2.part
